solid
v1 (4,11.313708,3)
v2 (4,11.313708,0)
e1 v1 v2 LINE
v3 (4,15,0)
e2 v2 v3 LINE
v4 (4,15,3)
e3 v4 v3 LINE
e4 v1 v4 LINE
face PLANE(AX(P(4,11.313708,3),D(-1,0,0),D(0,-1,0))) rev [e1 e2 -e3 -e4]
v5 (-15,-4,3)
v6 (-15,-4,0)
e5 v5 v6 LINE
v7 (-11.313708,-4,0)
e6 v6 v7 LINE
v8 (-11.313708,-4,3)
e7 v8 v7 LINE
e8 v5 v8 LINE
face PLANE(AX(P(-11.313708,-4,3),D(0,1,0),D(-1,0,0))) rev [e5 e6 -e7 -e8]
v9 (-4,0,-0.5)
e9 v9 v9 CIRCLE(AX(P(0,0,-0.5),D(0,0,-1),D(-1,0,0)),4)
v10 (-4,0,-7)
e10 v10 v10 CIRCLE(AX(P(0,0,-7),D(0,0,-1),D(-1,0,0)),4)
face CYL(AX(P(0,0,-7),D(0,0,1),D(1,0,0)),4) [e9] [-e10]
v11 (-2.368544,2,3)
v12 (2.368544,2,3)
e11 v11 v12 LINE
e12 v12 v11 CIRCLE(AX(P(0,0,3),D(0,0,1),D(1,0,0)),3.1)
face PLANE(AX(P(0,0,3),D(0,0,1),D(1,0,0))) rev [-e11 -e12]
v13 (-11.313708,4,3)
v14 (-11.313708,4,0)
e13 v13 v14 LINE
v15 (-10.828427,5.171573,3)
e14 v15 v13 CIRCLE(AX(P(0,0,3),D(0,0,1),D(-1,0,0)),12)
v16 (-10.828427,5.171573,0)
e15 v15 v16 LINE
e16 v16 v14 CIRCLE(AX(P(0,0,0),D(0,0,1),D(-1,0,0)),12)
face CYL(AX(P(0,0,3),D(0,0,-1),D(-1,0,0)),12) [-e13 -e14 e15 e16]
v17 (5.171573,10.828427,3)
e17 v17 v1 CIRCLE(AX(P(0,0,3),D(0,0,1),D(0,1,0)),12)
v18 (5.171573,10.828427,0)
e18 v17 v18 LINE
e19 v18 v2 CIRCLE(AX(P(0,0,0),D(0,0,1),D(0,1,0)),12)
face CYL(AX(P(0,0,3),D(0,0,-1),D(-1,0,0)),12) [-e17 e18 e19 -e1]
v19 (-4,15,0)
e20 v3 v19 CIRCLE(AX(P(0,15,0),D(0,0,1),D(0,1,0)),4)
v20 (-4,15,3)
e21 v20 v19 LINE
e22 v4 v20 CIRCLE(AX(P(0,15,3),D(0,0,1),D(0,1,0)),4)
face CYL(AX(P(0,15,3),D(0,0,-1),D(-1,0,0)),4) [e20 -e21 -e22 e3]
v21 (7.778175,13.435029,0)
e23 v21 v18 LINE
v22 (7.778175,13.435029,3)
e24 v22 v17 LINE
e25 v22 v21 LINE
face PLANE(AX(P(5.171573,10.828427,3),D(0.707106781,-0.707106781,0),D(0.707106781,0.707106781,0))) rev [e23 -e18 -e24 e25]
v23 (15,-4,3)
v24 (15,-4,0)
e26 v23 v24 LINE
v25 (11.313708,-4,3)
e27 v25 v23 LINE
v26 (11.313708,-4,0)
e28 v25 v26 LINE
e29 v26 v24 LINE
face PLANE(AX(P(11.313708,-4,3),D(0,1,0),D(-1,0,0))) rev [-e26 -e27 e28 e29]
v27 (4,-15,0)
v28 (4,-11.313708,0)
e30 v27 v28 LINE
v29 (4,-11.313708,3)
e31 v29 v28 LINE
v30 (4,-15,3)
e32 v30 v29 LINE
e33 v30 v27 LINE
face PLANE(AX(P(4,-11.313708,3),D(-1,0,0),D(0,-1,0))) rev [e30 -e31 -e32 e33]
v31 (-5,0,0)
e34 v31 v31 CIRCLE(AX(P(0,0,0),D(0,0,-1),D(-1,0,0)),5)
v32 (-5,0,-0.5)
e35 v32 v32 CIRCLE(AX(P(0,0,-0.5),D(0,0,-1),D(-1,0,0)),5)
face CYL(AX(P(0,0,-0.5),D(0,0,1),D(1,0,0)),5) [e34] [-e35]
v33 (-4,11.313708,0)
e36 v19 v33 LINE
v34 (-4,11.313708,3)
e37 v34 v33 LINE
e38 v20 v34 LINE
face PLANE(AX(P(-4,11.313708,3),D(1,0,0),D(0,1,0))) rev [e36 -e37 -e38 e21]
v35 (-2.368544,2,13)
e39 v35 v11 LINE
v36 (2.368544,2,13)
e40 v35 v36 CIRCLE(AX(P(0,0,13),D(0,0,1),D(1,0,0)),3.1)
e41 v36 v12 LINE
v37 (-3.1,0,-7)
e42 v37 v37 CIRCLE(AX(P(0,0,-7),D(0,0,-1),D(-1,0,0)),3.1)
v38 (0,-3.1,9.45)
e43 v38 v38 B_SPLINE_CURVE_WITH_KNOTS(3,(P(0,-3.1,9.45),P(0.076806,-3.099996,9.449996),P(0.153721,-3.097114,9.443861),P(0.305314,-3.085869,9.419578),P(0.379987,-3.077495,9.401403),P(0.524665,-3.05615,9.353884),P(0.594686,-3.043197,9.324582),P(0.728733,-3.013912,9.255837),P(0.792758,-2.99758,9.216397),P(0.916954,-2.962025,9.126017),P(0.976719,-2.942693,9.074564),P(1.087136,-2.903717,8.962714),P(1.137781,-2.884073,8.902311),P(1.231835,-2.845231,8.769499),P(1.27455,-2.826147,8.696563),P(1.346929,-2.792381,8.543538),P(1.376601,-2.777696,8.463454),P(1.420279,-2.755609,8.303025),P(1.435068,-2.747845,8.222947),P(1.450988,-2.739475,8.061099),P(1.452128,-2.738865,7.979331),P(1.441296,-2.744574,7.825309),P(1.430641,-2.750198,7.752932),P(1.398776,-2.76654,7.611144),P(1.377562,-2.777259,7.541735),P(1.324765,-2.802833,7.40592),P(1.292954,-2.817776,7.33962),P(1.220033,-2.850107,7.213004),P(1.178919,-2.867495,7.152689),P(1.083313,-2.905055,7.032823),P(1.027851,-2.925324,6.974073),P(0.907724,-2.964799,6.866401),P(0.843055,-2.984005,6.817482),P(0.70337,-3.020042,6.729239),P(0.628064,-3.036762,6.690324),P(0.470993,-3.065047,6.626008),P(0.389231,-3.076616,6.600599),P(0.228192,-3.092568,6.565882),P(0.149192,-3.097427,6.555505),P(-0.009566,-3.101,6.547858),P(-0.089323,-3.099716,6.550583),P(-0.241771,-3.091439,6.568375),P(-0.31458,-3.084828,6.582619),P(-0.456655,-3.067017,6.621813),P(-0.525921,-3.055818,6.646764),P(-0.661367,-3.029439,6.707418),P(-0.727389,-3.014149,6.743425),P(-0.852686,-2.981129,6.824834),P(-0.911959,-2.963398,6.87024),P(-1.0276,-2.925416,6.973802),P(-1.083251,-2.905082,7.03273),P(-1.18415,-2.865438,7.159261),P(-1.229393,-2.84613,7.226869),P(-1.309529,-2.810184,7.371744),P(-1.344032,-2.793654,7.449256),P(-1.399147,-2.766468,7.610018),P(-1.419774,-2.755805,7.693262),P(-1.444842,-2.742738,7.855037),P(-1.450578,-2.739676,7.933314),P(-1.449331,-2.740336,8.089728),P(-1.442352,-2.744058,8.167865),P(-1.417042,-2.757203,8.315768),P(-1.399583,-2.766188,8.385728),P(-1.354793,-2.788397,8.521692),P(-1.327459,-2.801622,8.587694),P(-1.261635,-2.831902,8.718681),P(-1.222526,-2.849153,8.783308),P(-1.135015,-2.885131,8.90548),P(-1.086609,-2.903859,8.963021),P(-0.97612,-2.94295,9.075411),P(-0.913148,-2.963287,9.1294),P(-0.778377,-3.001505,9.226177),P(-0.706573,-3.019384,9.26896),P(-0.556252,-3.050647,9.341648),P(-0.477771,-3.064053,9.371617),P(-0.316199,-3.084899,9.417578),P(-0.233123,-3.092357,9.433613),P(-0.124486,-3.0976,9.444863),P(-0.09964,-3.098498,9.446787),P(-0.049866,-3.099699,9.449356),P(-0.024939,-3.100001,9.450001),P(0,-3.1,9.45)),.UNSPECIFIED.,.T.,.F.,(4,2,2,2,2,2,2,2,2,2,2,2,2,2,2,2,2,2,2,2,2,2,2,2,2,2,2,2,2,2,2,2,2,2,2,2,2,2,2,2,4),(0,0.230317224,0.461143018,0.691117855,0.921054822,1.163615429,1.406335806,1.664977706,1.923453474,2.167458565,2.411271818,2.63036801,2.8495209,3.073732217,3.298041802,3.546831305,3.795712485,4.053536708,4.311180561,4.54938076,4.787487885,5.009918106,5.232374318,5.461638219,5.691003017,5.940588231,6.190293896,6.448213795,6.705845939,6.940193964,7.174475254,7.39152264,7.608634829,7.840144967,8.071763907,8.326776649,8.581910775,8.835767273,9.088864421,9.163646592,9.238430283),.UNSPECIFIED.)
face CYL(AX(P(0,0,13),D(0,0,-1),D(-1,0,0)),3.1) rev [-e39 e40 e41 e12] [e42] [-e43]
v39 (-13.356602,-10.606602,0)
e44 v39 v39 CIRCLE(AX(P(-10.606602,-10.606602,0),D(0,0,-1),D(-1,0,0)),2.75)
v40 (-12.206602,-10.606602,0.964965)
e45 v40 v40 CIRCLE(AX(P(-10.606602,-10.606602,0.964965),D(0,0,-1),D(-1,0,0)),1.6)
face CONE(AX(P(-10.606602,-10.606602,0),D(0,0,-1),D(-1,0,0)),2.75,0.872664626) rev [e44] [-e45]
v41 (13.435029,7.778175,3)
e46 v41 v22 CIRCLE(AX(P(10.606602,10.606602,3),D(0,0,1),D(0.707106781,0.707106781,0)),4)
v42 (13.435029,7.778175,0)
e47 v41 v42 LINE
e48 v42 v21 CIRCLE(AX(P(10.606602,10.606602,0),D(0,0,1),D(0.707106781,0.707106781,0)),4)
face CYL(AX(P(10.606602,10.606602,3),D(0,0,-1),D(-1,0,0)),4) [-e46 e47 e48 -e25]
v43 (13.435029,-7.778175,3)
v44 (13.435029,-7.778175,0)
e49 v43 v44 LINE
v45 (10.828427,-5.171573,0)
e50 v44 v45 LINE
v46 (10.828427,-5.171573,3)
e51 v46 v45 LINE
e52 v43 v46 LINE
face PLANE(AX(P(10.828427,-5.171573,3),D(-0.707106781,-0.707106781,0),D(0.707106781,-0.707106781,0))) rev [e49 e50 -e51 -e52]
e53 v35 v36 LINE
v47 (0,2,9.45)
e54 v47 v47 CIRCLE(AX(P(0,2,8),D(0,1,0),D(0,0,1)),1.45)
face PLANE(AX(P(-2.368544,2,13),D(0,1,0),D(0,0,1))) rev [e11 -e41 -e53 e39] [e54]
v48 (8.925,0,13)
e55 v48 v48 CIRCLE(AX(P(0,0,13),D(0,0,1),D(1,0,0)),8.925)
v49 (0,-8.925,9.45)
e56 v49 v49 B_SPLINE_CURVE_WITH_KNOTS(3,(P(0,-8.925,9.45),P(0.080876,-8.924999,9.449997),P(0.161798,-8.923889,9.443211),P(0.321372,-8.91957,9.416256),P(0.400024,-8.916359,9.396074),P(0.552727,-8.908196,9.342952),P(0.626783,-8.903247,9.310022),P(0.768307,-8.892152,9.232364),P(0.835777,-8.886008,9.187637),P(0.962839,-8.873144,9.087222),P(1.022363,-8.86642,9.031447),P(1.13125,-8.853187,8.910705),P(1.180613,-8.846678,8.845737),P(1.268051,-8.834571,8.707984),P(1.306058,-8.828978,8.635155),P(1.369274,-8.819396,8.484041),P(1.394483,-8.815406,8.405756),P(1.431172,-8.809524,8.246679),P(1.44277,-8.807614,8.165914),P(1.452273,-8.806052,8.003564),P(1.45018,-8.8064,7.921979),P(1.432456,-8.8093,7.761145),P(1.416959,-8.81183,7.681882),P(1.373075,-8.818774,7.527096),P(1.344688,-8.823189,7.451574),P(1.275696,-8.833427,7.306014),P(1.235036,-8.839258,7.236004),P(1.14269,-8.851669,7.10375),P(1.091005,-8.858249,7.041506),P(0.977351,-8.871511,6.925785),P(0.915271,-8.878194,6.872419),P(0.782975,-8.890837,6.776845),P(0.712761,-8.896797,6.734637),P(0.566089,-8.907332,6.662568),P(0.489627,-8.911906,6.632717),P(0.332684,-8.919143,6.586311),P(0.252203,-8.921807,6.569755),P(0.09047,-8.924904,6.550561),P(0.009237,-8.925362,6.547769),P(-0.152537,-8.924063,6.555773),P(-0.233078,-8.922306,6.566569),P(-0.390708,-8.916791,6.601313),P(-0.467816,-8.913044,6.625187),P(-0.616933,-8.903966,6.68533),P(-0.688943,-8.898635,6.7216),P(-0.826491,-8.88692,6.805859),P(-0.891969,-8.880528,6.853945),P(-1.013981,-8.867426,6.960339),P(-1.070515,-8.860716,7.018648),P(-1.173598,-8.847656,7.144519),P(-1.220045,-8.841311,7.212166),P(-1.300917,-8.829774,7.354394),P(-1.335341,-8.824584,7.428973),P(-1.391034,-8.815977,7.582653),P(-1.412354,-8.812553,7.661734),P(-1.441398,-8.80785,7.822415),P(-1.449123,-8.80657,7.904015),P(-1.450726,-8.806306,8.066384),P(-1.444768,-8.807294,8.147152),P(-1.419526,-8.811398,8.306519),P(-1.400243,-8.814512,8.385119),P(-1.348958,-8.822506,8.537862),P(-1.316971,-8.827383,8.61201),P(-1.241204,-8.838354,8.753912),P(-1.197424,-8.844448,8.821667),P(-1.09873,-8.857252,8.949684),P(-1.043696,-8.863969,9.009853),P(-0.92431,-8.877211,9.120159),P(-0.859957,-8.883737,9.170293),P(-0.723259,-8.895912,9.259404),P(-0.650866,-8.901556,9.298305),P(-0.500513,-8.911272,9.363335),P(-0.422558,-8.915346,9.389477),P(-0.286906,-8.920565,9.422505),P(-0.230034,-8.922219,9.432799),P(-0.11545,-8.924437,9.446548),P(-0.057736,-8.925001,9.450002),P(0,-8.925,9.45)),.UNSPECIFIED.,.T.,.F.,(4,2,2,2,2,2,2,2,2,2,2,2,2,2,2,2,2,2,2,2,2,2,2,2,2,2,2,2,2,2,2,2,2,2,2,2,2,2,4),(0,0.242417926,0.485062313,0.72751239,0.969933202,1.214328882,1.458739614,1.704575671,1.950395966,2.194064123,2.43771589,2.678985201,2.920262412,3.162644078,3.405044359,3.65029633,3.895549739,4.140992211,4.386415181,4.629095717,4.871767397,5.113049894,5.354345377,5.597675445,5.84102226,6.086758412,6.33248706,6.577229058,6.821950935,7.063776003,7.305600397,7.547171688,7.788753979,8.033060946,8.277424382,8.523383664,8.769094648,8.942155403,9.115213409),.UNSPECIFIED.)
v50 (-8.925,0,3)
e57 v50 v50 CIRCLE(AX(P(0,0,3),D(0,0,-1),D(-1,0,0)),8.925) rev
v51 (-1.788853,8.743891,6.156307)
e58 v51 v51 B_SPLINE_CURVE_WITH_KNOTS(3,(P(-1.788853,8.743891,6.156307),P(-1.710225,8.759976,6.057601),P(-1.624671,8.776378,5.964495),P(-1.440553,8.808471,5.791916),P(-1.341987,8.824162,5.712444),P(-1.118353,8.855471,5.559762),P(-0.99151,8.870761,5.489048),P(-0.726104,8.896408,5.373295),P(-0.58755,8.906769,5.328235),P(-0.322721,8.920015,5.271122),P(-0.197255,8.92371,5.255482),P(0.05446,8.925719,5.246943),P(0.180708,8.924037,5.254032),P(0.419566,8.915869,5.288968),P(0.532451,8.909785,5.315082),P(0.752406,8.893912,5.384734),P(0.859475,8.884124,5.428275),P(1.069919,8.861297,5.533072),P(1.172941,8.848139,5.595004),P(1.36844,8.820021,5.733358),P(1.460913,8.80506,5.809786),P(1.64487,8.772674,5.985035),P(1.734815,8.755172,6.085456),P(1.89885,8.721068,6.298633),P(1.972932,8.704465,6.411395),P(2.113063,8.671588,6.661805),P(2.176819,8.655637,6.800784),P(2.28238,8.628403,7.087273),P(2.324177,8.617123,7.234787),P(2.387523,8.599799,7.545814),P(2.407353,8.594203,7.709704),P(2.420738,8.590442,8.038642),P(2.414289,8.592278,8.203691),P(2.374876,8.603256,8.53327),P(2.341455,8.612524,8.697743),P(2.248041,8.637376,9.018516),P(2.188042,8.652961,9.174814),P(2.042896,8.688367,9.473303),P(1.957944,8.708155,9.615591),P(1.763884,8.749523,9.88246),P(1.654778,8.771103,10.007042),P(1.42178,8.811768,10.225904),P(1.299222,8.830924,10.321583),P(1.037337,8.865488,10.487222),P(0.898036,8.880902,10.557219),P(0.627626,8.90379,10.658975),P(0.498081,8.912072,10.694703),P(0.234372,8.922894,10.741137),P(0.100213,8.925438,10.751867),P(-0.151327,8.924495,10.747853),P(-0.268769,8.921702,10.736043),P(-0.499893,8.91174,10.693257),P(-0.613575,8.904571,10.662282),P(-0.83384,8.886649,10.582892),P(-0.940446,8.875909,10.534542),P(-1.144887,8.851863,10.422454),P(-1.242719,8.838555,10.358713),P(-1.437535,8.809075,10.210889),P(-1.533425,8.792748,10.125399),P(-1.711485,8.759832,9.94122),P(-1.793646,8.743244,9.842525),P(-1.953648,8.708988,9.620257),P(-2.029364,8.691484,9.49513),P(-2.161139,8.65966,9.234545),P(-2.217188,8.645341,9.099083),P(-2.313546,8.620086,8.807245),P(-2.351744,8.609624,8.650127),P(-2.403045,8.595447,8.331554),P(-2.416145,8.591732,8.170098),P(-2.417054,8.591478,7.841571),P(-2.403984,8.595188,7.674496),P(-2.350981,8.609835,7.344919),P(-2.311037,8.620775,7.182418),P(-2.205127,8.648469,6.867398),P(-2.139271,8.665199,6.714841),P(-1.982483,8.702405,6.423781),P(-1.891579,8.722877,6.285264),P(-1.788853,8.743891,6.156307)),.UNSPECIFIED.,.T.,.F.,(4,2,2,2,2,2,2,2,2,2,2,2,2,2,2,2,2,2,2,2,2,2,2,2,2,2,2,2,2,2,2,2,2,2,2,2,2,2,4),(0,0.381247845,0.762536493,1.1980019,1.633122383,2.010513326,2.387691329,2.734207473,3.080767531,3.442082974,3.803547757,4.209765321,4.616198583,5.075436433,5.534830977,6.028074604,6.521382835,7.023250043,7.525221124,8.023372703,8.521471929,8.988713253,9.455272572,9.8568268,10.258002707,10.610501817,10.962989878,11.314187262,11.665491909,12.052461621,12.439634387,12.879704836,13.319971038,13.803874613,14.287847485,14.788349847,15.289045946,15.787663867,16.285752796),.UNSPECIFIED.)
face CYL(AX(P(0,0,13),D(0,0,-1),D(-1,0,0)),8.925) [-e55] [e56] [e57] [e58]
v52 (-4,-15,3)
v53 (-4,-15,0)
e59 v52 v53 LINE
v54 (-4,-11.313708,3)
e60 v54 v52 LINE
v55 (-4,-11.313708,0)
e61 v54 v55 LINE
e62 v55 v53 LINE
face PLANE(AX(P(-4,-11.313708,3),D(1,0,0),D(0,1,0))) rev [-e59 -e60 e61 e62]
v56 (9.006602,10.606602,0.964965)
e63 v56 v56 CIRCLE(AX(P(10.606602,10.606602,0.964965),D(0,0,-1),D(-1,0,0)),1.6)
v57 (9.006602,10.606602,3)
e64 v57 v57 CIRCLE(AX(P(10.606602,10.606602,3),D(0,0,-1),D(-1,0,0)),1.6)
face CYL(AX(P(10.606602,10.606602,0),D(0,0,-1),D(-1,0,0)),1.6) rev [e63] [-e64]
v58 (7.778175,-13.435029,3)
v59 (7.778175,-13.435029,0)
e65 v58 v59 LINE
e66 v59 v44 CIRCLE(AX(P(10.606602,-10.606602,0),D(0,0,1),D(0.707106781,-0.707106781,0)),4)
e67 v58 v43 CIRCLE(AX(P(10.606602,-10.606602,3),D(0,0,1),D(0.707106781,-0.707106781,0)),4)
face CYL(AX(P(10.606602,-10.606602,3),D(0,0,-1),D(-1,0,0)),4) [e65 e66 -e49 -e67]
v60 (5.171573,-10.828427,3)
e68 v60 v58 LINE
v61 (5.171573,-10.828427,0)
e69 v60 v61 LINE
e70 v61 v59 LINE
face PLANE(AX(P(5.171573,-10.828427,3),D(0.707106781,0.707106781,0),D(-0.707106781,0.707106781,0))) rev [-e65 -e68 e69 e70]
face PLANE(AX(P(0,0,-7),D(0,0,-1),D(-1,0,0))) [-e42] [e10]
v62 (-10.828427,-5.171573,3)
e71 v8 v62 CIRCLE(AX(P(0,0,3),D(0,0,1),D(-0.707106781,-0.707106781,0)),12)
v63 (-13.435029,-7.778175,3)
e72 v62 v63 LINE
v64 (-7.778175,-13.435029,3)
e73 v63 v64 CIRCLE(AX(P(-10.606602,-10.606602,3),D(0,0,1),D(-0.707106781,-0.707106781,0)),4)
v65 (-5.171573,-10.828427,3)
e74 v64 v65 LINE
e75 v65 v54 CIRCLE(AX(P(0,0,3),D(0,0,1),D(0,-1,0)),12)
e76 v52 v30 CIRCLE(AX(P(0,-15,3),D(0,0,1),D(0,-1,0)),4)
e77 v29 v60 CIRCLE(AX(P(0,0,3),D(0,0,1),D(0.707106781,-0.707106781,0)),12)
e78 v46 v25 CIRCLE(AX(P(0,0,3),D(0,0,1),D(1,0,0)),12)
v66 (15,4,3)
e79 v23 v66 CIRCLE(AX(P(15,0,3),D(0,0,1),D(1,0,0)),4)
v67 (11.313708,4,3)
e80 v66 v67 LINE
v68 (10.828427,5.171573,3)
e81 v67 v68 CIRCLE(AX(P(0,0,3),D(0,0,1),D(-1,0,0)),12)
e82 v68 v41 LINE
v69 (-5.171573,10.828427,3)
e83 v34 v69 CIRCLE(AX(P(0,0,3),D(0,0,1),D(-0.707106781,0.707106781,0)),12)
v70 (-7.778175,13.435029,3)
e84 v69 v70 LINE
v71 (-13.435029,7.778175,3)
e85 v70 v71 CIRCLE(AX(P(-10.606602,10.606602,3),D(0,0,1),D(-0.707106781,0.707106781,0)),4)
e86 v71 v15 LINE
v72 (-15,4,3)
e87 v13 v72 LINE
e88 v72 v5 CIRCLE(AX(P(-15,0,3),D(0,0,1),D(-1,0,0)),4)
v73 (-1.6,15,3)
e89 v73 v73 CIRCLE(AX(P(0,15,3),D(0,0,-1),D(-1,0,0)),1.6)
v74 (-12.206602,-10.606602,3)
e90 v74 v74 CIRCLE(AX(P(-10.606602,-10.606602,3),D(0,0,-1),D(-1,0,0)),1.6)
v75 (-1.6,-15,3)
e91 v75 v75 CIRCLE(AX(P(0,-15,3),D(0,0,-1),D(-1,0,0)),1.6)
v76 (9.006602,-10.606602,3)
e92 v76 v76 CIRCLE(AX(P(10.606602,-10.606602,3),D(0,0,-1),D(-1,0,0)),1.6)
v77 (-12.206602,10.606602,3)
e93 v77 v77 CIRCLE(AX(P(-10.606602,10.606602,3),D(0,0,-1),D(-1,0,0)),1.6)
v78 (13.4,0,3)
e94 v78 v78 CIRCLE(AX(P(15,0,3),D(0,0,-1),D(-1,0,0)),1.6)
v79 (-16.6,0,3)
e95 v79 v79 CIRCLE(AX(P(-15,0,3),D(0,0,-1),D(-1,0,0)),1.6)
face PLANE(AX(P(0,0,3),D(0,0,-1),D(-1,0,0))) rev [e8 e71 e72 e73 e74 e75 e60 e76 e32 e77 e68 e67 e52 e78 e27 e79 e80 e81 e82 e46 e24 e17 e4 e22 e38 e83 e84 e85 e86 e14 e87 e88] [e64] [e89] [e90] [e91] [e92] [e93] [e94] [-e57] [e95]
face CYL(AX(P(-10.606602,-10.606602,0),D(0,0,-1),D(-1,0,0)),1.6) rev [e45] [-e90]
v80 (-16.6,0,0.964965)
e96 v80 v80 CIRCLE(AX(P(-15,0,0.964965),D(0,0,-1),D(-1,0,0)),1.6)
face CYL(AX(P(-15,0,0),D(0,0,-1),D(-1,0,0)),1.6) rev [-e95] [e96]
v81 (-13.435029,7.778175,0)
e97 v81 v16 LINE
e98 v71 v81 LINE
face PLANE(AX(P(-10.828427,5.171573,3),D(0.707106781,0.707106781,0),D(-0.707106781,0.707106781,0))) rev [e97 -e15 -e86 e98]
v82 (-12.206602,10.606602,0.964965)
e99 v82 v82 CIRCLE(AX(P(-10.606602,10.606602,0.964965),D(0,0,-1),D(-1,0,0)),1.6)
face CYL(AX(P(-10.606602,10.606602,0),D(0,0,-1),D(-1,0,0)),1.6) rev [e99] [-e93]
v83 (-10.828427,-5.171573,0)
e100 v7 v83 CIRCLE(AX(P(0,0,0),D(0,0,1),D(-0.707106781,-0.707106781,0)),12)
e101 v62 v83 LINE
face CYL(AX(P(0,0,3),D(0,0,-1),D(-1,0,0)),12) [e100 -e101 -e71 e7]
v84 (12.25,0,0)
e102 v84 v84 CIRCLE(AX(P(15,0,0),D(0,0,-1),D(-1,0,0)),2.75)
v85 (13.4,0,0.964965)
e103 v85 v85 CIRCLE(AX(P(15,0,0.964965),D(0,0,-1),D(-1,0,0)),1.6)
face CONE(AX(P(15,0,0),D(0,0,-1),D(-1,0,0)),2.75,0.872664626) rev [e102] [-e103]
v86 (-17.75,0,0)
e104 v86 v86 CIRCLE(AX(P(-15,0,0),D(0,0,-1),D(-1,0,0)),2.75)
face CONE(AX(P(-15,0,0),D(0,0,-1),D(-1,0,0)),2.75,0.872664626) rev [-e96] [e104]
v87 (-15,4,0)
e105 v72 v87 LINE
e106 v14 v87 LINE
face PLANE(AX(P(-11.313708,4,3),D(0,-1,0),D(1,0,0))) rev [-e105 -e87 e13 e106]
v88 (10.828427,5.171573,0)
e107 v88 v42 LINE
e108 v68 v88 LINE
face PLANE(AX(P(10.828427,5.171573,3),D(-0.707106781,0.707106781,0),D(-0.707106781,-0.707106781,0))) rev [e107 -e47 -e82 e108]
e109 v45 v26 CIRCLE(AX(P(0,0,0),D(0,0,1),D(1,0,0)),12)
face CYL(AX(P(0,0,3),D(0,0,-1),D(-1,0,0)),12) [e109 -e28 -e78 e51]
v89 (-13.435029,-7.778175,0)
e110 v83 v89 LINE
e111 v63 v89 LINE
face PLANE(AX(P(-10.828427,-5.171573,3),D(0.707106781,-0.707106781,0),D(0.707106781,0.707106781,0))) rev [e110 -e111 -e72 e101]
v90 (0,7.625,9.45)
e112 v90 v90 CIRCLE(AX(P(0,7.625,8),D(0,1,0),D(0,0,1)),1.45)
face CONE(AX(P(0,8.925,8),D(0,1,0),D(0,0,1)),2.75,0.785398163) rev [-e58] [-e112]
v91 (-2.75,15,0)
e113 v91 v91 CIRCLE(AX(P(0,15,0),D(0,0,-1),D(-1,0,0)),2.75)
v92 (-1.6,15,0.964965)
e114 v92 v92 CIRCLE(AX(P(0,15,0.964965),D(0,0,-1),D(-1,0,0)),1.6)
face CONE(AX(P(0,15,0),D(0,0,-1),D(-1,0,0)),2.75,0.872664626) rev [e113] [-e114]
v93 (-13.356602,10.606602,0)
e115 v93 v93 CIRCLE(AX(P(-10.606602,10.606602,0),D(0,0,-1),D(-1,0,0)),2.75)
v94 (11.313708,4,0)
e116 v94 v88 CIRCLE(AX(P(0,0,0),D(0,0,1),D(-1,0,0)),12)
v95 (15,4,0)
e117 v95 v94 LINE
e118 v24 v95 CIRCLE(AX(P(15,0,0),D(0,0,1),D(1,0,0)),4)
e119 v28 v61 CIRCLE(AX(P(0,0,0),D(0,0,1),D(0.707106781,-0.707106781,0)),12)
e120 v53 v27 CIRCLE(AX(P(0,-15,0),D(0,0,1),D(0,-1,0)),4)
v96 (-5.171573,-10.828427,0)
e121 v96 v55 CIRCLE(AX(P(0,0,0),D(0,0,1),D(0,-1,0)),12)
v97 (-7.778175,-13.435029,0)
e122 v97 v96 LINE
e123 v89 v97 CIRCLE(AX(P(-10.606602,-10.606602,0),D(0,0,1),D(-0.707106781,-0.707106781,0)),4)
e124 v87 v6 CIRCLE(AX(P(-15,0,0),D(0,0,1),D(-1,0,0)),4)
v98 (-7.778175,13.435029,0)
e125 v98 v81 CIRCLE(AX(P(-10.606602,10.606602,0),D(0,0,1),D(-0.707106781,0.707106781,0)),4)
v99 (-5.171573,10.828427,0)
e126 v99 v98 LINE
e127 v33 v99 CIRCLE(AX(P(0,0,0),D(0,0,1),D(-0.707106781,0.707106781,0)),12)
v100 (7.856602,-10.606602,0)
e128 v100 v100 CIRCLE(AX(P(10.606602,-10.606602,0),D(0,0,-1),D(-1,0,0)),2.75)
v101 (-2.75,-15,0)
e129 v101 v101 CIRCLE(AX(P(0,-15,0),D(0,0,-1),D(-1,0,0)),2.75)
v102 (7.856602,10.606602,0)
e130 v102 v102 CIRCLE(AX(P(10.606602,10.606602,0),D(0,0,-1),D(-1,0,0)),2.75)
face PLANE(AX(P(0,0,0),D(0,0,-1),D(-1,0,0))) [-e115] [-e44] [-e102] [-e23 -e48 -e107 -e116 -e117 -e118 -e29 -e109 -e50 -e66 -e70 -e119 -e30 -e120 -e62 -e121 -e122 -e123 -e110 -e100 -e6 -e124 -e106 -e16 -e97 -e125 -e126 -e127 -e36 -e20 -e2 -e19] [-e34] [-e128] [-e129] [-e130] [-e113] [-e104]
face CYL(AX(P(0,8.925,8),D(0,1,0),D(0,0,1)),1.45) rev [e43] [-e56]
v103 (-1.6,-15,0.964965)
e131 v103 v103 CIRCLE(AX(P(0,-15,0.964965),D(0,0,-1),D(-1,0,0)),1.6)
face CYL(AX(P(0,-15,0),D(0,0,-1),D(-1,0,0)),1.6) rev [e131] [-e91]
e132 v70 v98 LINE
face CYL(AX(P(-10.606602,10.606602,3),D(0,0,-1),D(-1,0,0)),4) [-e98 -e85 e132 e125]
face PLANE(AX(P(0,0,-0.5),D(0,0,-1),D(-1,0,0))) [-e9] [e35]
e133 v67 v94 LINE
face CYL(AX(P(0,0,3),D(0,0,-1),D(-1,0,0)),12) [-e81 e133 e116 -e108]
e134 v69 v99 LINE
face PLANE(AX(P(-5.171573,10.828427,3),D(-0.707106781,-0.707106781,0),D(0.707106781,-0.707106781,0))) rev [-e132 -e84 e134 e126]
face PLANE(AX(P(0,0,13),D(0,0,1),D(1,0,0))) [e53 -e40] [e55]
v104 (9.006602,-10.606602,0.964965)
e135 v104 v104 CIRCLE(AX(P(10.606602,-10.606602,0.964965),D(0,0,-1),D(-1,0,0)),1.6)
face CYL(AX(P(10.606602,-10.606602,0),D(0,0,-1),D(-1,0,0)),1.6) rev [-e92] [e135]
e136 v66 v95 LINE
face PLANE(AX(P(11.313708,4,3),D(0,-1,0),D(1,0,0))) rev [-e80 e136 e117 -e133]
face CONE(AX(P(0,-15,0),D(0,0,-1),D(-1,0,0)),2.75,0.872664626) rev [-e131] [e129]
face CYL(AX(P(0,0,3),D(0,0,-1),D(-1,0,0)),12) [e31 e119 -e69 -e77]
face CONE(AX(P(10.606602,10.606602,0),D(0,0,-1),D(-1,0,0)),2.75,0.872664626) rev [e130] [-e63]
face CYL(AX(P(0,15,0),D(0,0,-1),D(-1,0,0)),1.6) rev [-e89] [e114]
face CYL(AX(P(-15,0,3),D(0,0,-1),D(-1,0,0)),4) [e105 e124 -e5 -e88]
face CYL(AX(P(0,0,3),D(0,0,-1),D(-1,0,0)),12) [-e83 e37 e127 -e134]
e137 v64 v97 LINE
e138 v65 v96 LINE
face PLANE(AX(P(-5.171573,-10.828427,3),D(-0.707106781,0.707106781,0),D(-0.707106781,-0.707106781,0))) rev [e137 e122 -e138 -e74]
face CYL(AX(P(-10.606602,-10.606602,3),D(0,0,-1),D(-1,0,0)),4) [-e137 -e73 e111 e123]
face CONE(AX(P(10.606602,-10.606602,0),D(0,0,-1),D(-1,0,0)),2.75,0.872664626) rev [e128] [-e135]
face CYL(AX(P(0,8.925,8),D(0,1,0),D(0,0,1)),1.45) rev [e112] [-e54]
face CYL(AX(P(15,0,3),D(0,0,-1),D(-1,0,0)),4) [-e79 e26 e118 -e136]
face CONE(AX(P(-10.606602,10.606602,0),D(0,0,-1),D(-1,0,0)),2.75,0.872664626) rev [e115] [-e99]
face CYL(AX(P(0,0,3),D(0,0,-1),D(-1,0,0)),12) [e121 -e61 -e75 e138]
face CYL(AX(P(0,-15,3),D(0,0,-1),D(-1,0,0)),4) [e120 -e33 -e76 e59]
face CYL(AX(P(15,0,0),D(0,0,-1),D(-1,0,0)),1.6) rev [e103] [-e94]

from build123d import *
from build123d.topology import SkipClean

# Parameters (mm, degrees)
MAIN_DEPTH                                        = 3
R_P_TITION_CIRCULAIRE1_COUNT                      = 8
ESQUISSE2_R                                       = 8.925
ESQUISSE2_R_2                                     = 3.1
MOTORLINK_DEPTH                                   = 10
MEPLAT_DEPTH                                      = 10
ESQUISSE4_R                                       = 3.1
HOLE_DEPTH                                        = 29.670542374
ESQUISSE5_R                                       = 4
ESQUISSE5_R_2                                     = 3.1
ROLLINGBEARINGLINK_DEPTH                          = 7
ESQUISSE6_R                                       = 5
ESQUISSE6_R_2                                     = 4
ROLLINGBEARLINK2_DEPTH                            = 0.5
FRAISAGE_POUR_VIS_T_TE_FRAIS_E_100_D              = 3.2
FRAISAGE_POUR_VIS_T_TE_FRAIS_E_100_CSINK_D        = 5.5
FRAISAGE_POUR_VIS_T_TE_FRAIS_E_100_CSINK_ANGLE    = 100
R_P_TITION_CIRCULAIRE2_COUNT                      = 8
CSK_FOR_M2_5_FLAT_HEAD_MACHINE_SCREW1_D           = 2.9
CSK_FOR_M2_5_FLAT_HEAD_MACHINE_SCREW1_CSINK_D     = 5.5
CSK_FOR_M2_5_FLAT_HEAD_MACHINE_SCREW1_CSINK_ANGLE = 90


with BuildPart() as part:
    # Esquisse1 → Main (new body)
    with BuildSketch(Plane.XY):
        with BuildLine():
            Line((11.313708499, 4), (15, 4))
            ThreePointArc((15, 4), (19, 0), (15, -4))
            Line((15, -4), (11.313708499, -4))
            ThreePointArc((11.313708499, -4), (11.204044803, -4.297601664), (11.08655439, -4.592201188))
            Line((11.08655439, -4.592201188), (0, 0))
            Line((0, 0), (11.08655439, 4.592201188))
            ThreePointArc((11.08655439, 4.592201188), (11.204044803, 4.297601664), (11.313708499, 4))
        make_face()
    main = extrude(amount=MAIN_DEPTH)

    # Répétition circulaire1: Main ×8 about axis
    r_p_tition_circulaire1_axis = Axis((0, 0, 11.883707709), (0, 0, -1))
    for i in range(1, R_P_TITION_CIRCULAIRE1_COUNT):
        add(main.rotate(r_p_tition_circulaire1_axis, i * 360 / R_P_TITION_CIRCULAIRE1_COUNT))

    # Esquisse2 → MotorLink (add)
    with BuildSketch(Plane.XY.offset(3)):
        Circle(ESQUISSE2_R)
        Circle(ESQUISSE2_R_2, mode=Mode.SUBTRACT)
    extrude(amount=MOTORLINK_DEPTH)

    # Esquisse3 → Meplat (add)
    with BuildSketch(Plane.XY.offset(3)):
        with BuildLine():
            Line((-2.368543856, 2), (2.368543856, 2))
            ThreePointArc((2.368543856, 2), (0, 3.1), (-2.368543856, 2))
        make_face()
    extrude(amount=MEPLAT_DEPTH)

    # Esquisse4 → Hole (cut, through all)
    with SkipClean():  # the faces are left unmerged after this step: merging them gives an invalid solid
        with BuildSketch(Plane.XY.offset(3)):
            Circle(ESQUISSE4_R)
        extrude(amount=-HOLE_DEPTH, mode=Mode.SUBTRACT)

    # Esquisse5 → RollingBearingLink (add)
    with SkipClean():  # the faces are left unmerged after this step: merging them gives an invalid solid
        with BuildSketch(Plane(origin=(0, 0, 0), x_dir=(-1, 0, 0), z_dir=(0, 0, -1))):
            Circle(ESQUISSE5_R)
            Circle(ESQUISSE5_R_2, mode=Mode.SUBTRACT)
        extrude(amount=ROLLINGBEARINGLINK_DEPTH)

    # Esquisse6 → RollingBearLink2 (add)
    with SkipClean():  # the faces are left unmerged after this step: merging them gives an invalid solid
        with BuildSketch(Plane(origin=(0, 0, 0), x_dir=(-1, 0, 0), z_dir=(0, 0, -1))):
            Circle(ESQUISSE6_R)
            Circle(ESQUISSE6_R_2, mode=Mode.SUBTRACT)
        extrude(amount=ROLLINGBEARLINK2_DEPTH)
    add(part.part.scale(1), mode=Mode.REPLACE)  # the faces are merged on a copy

    # Fraisage pour vis à tête fraisée (100) #01 (through all)
    with Locations(Plane(origin=(0, 0, 0), x_dir=(-1, 0, 0), z_dir=(0, 0, -1))):
        with Locations((15, 0)):
            fraisage_pour_vis_t_te_frais_e_100 = CounterSinkHole(FRAISAGE_POUR_VIS_T_TE_FRAIS_E_100_D / 2, FRAISAGE_POUR_VIS_T_TE_FRAIS_E_100_CSINK_D / 2, counter_sink_angle=FRAISAGE_POUR_VIS_T_TE_FRAIS_E_100_CSINK_ANGLE)

    # Répétition circulaire2: Fraisage pour vis à tête fraisée (100) #01 ×8 about axis
    r_p_tition_circulaire2_axis = Axis((0, 0, 11.883707709), (0, 0, -1))
    for i in range(1, R_P_TITION_CIRCULAIRE2_COUNT):
        add(fraisage_pour_vis_t_te_frais_e_100.rotate(r_p_tition_circulaire2_axis, i * 360 / R_P_TITION_CIRCULAIRE2_COUNT), mode=Mode.SUBTRACT)

    # CSK for M2.5 Flat Head Machine Screw1 (through all)
    with Locations(Plane(origin=(0, 8.925, 0), x_dir=(1, 0, 0), z_dir=(0, 1, 0))):
        with Locations((0, -8)):
            CounterSinkHole(CSK_FOR_M2_5_FLAT_HEAD_MACHINE_SCREW1_D / 2, CSK_FOR_M2_5_FLAT_HEAD_MACHINE_SCREW1_CSINK_D / 2, counter_sink_angle=CSK_FOR_M2_5_FLAT_HEAD_MACHINE_SCREW1_CSINK_ANGLE)


solid = part.part
